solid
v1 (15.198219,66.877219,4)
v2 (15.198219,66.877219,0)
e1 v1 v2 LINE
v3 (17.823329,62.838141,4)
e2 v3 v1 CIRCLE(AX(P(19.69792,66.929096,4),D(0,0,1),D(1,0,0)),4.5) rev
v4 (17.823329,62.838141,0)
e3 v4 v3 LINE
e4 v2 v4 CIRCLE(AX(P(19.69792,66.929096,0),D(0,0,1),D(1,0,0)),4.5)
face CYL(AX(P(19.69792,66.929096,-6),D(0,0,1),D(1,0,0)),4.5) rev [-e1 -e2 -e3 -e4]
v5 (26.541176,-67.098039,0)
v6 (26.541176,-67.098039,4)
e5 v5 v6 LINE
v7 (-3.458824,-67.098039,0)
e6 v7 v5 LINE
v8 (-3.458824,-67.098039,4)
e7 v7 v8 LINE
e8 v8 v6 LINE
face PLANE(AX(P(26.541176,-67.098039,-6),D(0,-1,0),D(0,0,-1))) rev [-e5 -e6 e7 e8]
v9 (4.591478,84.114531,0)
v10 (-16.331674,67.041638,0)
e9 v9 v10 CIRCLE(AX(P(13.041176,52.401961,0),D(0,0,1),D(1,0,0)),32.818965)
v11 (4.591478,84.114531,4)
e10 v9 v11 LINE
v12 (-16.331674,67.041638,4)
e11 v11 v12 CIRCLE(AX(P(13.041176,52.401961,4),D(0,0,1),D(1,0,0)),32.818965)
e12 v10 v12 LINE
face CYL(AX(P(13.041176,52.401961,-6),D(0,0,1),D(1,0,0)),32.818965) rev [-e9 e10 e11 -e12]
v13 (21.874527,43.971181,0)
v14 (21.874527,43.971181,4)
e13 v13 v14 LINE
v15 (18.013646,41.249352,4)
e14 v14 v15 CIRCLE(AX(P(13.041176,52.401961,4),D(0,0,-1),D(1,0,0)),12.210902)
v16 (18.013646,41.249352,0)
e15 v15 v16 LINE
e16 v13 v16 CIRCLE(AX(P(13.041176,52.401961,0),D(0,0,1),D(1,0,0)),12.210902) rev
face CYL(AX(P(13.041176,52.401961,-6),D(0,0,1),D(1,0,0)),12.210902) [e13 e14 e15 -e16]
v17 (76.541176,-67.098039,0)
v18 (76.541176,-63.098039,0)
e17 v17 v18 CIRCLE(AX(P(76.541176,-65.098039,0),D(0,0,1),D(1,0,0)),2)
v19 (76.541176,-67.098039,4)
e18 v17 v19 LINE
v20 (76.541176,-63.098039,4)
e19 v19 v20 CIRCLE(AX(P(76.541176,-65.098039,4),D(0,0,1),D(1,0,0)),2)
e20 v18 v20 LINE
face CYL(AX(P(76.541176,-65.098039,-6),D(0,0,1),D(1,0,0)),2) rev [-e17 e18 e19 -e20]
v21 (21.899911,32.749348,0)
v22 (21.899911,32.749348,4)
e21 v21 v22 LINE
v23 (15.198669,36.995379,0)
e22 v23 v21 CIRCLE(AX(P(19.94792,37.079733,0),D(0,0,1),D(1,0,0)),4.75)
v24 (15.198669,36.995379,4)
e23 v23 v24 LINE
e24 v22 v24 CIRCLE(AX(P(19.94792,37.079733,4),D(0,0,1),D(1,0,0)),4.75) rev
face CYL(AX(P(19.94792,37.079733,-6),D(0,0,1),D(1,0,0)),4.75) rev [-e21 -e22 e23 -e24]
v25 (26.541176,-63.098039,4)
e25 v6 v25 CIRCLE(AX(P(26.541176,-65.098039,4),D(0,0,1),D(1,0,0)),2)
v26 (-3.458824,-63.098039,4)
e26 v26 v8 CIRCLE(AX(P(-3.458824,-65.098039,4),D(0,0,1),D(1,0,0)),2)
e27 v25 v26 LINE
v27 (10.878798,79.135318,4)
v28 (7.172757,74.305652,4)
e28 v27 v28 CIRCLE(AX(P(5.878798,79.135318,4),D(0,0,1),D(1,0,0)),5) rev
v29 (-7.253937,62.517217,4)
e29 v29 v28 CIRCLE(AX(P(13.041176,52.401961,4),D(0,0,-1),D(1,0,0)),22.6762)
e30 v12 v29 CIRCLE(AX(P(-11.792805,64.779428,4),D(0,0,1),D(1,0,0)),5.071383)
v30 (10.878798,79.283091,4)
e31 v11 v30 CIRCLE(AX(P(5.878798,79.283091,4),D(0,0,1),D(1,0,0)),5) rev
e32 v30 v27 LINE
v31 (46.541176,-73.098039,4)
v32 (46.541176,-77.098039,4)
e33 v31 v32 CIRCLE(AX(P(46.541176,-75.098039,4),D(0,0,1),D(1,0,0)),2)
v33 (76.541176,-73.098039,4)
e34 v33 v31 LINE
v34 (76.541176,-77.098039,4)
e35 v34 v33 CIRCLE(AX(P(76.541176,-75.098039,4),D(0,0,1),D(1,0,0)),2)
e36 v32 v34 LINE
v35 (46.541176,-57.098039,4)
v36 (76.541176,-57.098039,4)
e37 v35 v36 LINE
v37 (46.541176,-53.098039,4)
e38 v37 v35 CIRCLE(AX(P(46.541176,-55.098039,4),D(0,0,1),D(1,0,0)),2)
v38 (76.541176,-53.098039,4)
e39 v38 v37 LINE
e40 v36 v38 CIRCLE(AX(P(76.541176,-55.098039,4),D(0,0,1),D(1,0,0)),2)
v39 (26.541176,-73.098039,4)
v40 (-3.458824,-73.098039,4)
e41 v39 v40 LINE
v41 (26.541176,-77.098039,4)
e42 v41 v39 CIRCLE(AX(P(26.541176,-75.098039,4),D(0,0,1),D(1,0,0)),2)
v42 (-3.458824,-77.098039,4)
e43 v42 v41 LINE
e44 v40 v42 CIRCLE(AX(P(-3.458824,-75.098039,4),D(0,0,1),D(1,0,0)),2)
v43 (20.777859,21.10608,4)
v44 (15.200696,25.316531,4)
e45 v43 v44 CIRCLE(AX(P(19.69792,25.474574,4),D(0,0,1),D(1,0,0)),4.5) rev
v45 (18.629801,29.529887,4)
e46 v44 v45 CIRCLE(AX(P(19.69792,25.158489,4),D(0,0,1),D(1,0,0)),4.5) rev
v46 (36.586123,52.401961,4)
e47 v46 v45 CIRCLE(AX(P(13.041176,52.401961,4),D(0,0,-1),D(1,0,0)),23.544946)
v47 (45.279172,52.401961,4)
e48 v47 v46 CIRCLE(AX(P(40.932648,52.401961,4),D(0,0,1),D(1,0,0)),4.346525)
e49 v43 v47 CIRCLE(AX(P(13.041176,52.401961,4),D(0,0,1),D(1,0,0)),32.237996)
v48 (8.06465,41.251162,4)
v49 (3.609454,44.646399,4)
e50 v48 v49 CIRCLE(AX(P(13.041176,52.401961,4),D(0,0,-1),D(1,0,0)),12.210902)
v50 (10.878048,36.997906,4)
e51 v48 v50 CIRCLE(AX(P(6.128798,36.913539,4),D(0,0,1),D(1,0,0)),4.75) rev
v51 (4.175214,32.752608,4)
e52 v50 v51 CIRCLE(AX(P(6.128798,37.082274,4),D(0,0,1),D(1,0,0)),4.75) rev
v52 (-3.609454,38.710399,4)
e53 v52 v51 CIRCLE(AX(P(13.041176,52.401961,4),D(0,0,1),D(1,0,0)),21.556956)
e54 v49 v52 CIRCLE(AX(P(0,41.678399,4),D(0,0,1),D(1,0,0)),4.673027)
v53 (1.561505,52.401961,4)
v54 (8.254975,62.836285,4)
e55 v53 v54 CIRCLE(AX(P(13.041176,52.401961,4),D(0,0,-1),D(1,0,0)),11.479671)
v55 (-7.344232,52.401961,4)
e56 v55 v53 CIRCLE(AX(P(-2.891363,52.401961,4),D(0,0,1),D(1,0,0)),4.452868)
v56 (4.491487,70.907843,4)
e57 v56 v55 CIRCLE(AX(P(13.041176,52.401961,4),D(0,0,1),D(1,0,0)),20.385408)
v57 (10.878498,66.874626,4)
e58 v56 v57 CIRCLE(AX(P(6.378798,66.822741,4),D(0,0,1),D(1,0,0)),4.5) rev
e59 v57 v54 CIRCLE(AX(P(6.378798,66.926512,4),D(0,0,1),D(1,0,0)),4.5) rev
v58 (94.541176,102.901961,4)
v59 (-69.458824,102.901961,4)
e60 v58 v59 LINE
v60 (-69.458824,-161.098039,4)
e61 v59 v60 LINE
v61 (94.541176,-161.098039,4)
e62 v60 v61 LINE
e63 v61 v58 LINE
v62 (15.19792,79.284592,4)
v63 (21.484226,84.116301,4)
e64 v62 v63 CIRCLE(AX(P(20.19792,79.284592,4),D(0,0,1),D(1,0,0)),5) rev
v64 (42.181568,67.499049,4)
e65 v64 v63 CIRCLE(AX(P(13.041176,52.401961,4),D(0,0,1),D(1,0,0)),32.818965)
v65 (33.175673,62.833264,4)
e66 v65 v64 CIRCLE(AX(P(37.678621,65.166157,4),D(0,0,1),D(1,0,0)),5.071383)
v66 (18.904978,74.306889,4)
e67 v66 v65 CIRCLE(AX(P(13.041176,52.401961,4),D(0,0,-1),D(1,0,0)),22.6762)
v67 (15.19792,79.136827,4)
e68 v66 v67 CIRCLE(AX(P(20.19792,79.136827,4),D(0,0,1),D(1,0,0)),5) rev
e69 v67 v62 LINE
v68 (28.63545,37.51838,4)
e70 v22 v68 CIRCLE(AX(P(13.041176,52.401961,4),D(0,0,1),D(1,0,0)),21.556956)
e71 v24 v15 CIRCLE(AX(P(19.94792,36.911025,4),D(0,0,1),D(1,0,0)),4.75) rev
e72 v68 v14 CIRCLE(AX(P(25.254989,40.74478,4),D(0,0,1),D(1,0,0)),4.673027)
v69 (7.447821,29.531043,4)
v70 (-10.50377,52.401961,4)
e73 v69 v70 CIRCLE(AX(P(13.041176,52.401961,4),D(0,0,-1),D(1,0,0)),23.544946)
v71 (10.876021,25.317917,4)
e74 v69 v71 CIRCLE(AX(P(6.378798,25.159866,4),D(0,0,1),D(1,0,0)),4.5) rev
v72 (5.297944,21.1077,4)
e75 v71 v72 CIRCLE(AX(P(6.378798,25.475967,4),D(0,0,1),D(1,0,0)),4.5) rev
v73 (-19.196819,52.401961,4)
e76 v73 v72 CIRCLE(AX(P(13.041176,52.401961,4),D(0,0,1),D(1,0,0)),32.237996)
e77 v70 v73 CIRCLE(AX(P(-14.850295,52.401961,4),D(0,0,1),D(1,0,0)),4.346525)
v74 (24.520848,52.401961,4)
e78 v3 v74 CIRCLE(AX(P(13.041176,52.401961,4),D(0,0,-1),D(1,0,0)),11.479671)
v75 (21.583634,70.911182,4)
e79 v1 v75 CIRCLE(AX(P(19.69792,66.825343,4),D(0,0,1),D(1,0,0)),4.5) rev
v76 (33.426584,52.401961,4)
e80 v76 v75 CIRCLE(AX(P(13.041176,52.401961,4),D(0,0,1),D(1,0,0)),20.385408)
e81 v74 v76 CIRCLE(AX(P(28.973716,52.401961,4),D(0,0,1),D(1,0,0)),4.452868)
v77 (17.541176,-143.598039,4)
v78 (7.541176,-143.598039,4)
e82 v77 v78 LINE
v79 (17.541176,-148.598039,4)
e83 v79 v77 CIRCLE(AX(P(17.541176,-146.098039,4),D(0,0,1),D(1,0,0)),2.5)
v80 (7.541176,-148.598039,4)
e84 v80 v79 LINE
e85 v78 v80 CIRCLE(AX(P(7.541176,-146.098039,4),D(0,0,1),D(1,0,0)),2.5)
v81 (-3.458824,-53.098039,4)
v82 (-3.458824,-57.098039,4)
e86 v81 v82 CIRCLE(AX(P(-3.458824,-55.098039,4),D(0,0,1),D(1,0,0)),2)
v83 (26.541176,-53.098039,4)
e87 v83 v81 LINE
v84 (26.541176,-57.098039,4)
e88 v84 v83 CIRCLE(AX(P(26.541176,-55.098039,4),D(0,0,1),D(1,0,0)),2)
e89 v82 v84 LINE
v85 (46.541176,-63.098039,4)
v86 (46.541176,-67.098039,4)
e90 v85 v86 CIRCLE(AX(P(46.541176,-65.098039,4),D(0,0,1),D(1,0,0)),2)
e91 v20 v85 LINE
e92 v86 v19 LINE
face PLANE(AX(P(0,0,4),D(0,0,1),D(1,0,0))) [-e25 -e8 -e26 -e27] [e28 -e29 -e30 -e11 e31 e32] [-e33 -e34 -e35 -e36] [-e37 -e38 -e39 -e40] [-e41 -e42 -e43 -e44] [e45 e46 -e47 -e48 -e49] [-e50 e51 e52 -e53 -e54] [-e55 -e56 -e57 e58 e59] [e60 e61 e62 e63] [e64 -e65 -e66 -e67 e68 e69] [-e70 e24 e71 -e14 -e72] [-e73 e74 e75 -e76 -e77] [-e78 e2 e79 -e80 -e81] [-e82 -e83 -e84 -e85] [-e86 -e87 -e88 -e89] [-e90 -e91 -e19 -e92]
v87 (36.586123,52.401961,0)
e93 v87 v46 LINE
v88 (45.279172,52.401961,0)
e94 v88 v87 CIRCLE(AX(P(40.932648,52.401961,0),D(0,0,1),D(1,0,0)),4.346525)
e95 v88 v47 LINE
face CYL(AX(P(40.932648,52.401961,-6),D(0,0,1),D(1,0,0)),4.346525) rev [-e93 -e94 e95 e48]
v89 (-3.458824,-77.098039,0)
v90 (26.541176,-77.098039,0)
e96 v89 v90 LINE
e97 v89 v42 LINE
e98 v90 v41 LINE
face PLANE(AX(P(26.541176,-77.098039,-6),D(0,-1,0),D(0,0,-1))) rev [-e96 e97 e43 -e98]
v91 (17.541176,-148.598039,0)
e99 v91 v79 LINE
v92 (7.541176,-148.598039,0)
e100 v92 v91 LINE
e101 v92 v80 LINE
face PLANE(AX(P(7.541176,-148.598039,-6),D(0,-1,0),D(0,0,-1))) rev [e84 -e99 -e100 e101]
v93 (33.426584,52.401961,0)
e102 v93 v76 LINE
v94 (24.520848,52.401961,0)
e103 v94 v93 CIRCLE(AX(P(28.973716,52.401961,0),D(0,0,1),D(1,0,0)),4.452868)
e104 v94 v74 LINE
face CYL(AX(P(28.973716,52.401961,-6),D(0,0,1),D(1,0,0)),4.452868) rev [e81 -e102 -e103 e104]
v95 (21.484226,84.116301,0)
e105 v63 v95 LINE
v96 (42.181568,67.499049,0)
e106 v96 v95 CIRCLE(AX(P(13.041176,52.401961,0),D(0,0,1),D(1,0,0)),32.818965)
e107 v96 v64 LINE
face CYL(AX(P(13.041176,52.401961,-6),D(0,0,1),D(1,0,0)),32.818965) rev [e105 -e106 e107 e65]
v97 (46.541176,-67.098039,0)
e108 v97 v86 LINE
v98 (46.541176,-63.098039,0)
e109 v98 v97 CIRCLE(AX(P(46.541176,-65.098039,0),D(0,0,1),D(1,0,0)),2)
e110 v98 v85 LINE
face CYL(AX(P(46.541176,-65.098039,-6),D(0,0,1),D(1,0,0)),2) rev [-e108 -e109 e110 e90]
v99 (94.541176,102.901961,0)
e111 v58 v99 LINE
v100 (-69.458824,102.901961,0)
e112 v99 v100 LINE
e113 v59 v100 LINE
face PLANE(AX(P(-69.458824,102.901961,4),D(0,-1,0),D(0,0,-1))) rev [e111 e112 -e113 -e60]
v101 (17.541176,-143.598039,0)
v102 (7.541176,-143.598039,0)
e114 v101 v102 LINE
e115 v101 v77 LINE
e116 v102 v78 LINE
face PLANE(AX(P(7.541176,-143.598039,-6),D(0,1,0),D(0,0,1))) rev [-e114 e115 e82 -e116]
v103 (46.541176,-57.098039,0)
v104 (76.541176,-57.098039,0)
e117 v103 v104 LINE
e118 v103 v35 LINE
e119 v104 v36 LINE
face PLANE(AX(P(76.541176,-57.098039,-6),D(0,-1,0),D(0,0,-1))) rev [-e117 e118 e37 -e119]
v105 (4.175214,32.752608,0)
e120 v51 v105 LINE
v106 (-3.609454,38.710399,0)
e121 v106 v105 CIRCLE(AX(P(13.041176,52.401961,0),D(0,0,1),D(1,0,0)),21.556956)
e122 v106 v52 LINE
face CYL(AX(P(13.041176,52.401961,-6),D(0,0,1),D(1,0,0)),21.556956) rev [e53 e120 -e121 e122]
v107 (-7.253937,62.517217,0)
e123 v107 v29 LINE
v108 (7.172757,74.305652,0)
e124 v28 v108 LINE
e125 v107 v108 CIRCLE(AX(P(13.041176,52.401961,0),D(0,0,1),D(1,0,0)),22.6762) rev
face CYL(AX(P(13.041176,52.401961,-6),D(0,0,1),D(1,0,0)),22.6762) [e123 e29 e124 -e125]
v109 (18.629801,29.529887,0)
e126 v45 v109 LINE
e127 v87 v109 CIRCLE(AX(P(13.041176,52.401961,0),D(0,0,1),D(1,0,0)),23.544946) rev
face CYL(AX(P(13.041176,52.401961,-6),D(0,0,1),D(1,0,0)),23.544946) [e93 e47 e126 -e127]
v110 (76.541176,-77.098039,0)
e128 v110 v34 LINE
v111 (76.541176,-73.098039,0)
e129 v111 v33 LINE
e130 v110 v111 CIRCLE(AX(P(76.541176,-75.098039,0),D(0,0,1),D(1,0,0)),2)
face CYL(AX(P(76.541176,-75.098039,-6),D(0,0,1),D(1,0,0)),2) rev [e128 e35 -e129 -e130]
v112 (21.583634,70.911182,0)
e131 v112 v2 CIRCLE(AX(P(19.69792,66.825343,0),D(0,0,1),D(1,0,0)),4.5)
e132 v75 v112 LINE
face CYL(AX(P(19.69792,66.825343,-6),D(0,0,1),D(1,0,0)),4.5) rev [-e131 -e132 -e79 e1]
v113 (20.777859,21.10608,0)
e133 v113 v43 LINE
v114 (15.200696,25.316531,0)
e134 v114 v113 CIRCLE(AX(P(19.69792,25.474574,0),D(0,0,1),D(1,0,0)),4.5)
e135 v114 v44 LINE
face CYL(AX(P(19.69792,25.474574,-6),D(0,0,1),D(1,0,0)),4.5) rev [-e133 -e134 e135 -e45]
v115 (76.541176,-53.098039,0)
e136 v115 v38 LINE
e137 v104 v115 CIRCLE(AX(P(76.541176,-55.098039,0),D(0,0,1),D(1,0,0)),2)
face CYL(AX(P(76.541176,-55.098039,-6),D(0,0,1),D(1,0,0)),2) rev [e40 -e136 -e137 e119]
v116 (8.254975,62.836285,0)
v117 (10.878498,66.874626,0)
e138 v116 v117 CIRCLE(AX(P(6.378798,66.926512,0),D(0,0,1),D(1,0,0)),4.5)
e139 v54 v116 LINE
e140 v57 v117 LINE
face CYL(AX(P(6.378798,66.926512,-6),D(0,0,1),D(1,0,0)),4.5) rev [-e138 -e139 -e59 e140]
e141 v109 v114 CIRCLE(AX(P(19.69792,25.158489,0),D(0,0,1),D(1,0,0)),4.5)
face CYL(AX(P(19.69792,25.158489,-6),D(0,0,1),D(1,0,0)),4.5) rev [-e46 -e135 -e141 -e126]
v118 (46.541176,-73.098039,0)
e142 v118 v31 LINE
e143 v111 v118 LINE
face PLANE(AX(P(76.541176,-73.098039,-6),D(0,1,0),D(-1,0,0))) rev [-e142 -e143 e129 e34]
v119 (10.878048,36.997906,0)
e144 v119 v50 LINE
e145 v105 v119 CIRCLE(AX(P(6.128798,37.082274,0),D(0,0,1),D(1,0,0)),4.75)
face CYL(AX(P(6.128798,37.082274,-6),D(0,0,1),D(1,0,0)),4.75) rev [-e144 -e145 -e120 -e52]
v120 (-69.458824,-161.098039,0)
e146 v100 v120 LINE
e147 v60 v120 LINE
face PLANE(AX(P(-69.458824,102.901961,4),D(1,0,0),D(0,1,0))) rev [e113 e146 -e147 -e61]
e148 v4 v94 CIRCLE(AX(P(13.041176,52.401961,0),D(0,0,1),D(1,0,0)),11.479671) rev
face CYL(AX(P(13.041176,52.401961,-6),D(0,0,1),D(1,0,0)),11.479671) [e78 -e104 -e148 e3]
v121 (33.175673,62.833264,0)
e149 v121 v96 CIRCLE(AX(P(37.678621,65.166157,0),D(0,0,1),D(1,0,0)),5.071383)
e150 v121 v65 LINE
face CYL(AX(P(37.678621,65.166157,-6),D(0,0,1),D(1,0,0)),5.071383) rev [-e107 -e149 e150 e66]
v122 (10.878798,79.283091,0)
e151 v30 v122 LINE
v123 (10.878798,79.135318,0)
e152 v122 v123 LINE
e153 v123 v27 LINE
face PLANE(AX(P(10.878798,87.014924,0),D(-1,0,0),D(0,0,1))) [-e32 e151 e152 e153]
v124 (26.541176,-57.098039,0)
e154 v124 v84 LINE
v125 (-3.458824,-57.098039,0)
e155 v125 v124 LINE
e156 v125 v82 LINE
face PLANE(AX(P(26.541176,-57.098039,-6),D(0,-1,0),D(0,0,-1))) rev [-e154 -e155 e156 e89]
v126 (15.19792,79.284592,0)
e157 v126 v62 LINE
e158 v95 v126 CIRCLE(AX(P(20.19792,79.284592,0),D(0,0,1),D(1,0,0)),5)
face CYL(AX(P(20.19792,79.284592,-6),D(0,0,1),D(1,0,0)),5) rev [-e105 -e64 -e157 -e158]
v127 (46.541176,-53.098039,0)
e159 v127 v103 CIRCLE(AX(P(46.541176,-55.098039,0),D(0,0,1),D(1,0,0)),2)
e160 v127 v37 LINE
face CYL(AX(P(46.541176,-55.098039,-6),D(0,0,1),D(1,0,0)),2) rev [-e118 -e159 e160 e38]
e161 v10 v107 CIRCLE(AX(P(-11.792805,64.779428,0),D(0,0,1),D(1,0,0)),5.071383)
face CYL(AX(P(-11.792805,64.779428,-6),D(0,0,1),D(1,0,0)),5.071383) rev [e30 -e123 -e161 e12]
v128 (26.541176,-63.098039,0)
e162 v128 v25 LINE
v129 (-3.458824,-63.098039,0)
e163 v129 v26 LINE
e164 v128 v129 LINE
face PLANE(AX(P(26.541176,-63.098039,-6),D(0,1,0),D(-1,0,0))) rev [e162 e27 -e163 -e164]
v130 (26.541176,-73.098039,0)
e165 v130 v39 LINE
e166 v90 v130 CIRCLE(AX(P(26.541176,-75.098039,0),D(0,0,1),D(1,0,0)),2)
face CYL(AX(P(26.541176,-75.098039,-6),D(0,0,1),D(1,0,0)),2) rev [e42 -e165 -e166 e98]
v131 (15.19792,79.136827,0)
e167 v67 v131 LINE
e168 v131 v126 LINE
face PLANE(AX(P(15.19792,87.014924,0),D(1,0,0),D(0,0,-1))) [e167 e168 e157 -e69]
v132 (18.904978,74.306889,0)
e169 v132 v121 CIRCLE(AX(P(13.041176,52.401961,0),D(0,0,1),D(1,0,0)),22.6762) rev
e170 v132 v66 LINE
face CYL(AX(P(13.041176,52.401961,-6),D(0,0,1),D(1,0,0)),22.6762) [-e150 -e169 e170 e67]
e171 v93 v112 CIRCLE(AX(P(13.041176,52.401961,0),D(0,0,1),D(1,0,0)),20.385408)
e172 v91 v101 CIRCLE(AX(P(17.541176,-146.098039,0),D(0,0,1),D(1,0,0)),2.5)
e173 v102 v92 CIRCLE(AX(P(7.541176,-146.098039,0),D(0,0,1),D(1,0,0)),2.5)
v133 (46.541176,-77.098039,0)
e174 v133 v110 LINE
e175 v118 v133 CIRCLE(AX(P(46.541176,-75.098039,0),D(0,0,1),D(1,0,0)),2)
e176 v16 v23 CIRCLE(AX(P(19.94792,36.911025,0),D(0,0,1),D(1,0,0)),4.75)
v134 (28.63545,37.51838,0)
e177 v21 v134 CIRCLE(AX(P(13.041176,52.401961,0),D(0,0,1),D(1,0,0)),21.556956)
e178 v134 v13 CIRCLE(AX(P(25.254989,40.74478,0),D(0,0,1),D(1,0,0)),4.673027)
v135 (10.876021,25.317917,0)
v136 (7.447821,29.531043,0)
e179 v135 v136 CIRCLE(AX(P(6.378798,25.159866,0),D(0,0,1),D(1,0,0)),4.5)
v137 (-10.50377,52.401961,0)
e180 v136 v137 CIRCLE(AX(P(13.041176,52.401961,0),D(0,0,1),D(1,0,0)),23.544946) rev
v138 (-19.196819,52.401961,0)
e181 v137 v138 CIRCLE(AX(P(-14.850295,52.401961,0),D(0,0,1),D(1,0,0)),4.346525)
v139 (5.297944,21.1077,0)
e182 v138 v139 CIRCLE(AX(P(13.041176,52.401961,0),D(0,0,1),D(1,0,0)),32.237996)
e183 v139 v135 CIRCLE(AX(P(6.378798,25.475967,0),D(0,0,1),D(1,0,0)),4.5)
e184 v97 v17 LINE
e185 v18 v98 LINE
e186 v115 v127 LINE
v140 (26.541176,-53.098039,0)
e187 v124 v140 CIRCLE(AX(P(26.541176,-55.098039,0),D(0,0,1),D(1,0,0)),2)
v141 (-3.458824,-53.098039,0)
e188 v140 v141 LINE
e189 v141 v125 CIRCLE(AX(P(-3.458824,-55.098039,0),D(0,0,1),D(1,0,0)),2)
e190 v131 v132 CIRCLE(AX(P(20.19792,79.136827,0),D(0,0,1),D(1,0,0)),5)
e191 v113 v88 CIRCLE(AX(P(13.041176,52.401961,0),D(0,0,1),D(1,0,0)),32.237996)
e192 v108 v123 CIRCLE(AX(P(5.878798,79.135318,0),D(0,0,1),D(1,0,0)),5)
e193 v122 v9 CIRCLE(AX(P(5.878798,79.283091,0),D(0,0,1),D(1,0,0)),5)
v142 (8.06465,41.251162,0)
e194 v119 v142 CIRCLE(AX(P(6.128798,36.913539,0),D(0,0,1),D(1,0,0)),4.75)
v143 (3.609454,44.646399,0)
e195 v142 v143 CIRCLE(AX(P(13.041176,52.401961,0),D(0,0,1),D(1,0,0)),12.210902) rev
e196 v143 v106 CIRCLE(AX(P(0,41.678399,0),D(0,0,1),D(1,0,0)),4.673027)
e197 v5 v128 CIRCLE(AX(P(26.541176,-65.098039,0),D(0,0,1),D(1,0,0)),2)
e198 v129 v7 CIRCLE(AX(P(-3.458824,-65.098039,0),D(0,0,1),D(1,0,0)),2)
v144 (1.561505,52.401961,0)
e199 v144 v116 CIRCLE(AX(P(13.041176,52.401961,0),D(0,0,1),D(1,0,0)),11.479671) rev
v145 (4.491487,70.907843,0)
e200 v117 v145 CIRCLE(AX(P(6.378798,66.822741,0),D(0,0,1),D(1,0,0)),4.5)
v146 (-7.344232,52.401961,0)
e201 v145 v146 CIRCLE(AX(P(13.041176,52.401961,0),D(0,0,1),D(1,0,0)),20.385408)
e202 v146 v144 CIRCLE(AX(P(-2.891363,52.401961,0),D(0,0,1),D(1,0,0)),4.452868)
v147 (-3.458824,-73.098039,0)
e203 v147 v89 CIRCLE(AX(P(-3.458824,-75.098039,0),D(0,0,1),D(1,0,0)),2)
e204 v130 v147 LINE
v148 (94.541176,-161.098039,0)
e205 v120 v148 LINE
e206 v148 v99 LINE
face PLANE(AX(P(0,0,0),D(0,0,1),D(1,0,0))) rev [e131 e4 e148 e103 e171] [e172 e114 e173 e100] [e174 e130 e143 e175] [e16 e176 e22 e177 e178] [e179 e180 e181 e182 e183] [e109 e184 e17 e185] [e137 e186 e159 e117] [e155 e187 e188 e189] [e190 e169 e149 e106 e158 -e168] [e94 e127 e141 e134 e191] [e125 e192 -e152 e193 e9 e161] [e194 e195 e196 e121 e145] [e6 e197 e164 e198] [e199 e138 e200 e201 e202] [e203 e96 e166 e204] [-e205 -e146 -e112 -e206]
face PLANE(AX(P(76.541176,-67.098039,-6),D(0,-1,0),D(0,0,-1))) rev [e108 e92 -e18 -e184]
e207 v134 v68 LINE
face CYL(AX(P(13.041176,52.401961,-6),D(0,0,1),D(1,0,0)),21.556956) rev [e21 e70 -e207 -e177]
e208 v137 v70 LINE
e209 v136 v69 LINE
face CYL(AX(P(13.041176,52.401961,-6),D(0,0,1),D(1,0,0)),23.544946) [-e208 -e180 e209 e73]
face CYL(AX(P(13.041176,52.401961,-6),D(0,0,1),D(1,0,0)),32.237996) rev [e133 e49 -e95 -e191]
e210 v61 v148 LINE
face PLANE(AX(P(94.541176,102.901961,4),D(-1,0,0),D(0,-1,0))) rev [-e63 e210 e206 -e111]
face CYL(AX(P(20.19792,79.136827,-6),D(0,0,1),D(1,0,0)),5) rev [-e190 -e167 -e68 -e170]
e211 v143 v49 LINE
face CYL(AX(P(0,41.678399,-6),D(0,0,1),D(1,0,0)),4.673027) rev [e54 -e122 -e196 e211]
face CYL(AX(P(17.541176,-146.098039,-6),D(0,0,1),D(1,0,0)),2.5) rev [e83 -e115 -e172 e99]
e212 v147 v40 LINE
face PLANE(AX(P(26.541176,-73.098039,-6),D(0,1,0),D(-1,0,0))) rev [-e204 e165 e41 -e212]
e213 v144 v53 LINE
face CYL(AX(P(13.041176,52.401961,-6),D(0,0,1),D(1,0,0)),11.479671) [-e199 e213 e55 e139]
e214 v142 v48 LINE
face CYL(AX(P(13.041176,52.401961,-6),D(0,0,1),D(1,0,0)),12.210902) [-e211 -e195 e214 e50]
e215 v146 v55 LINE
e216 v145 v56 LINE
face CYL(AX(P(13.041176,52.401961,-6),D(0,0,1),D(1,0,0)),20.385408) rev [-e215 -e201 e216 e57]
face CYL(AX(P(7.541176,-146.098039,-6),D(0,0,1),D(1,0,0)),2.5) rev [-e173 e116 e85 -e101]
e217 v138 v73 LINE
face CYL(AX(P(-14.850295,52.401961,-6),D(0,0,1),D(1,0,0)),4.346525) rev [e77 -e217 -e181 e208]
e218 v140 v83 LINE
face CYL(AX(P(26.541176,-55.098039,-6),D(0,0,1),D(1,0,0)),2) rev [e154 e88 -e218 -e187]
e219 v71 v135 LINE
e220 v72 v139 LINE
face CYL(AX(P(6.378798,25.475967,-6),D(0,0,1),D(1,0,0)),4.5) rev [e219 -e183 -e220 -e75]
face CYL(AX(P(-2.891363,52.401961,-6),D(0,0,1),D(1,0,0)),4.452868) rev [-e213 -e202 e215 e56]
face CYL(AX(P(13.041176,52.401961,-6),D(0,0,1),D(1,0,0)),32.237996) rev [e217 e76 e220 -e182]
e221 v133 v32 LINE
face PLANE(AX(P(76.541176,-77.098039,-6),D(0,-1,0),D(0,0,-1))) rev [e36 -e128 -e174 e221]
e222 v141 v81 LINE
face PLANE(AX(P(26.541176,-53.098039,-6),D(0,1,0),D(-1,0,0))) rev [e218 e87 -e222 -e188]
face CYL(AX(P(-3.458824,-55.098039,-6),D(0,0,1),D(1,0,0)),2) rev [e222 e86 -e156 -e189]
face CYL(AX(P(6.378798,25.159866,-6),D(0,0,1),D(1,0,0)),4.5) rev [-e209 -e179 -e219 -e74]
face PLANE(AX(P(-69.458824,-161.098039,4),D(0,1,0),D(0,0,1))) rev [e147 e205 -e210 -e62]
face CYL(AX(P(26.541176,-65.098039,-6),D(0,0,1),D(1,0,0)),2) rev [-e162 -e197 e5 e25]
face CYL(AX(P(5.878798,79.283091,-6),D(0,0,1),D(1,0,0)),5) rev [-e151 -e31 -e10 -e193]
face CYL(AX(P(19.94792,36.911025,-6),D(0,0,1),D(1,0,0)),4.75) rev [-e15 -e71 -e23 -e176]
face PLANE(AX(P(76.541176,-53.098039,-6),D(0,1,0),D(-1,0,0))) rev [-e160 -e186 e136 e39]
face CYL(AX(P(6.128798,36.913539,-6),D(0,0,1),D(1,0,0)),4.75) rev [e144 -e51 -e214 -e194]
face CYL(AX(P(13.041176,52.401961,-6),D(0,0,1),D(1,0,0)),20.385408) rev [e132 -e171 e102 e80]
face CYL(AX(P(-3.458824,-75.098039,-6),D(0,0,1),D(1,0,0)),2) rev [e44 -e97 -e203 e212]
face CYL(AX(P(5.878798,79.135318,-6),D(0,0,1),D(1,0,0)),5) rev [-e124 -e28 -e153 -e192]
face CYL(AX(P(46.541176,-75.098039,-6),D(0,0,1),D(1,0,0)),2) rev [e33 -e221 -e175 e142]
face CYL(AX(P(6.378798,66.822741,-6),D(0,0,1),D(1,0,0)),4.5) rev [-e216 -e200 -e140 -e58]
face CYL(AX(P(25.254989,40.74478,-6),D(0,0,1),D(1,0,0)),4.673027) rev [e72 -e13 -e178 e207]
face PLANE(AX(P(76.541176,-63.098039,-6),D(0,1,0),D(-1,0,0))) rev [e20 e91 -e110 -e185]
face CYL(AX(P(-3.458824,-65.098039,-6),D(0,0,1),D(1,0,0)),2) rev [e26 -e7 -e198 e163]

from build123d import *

# Parameters (mm, degrees)
SKETCH1_W            = 164
SKETCH1_H            = 264
BOSS_EXTRUDE1_DEPTH  = 4
CUT_EXTRUDE3_DEPTH   = 10
CUT_EXTRUDE4_DEPTH   = 10
LPATTERN1_COUNT      = 3
LPATTERN1_PITCH      = 10
LPATTERN1_COUNT_DIR2 = 2
LPATTERN1_PITCH_DIR2 = 50
CUT_EXTRUDE5_DEPTH   = 10
SKETCH5_W            = 4.319122357
SKETCH5_H            = 26.937684175
SKETCH5_H_2          = 25.730682063
BOSS_EXTRUDE2_DEPTH  = 4
FILLET3_R            = 5
FILLET4_R            = 5
FILLET5_R            = 4.5
FILLET6_R            = 4.5
FILLET7_R            = 4.75
FILLET8_R            = 4.75
FILLET9_R            = 4.5
FILLET10_R           = 4.5


with BuildPart() as part:
    # Sketch1 → Boss-Extrude1 (new body)
    with BuildSketch(Plane.XY):
        with Locations((12.541176471, -29.098039216)):
            Rectangle(SKETCH1_W, SKETCH1_H)
    extrude(amount=BOSS_EXTRUDE1_DEPTH)

    # Sketch2 → Cut-Extrude3 (cut)
    with BuildSketch(Plane.XY.offset(4)):
        with BuildLine():
            ThreePointArc((-19.196819428, 52.401960784), (13.041176471, 20.163964886), (45.279172369, 52.401960784))
            ThreePointArc((45.279172369, 52.401960784), (40.932647519, 56.748485634), (36.58612267, 52.401960784))
            ThreePointArc((36.58612267, 52.401960784), (13.041176471, 28.857014585), (-10.503769729, 52.401960784))
            ThreePointArc((-10.503769729, 52.401960784), (-14.850294578, 56.748485634), (-19.196819428, 52.401960784))
        make_face()
        with BuildLine():
            ThreePointArc((33.426584493, 52.401960784), (13.041176471, 72.787368807), (-7.344231552, 52.401960784))
            ThreePointArc((-7.344231552, 52.401960784), (-2.891363068, 47.949092301), (1.561505415, 52.401960784))
            ThreePointArc((1.561505415, 52.401960784), (13.041176471, 63.88163184), (24.520847526, 52.401960784))
            ThreePointArc((24.520847526, 52.401960784), (28.97371601, 47.949092301), (33.426584493, 52.401960784))
        make_face()
        with BuildLine():
            ThreePointArc((42.181568033, 67.499048907), (12.784631297, 85.219923468), (-16.331673874, 67.04163813))
            ThreePointArc((-16.331673874, 67.04163813), (-14.055015917, 60.240559274), (-7.253937061, 62.517217231))
            ThreePointArc((-7.253937061, 62.517217231), (12.863917084, 75.077467953), (33.17567306, 62.833264313))
            ThreePointArc((33.17567306, 62.833264313), (40.011512844, 60.663209124), (42.181568033, 67.499048907))
        make_face()
        with BuildLine():
            ThreePointArc((-3.609454357, 38.710399181), (12.244809645, 30.859719351), (28.635450382, 37.518379654))
            ThreePointArc((28.635450382, 37.518379654), (28.481389363, 44.125242049), (21.874526968, 43.97118103))
            ThreePointArc((21.874526968, 43.97118103), (12.590075808, 40.199393986), (3.609454357, 44.646398506))
            ThreePointArc((3.609454357, 44.646398506), (-2.967999663, 45.2878532), (-3.609454357, 38.710399181))
        make_face()
    extrude(amount=-CUT_EXTRUDE3_DEPTH, mode=Mode.SUBTRACT)

    # Sketch3 → Cut-Extrude4 (cut)
    with BuildSketch(Plane.XY.offset(4)):
        with BuildLine():
            Line((76.541176471, -57.098039216), (46.541176471, -57.098039216))
            ThreePointArc((46.541176471, -57.098039216), (44.541176471, -55.098039216), (46.541176471, -53.098039216))
            Line((46.541176471, -53.098039216), (76.541176471, -53.098039216))
            ThreePointArc((76.541176471, -53.098039216), (78.541176471, -55.098039216), (76.541176471, -57.098039216))
        make_face()
    cut_extrude4 = extrude(amount=-CUT_EXTRUDE4_DEPTH, mode=Mode.SUBTRACT)

    # LPattern1: Cut-Extrude4 3 × 2
    with Locations(*[(-j * LPATTERN1_PITCH_DIR2, -i * LPATTERN1_PITCH, 0) for i in range(LPATTERN1_COUNT) for j in range(LPATTERN1_COUNT_DIR2) if (i, j) != (0, 0)]):
        add(cut_extrude4, mode=Mode.SUBTRACT)

    # Sketch4 → Cut-Extrude5 (cut)
    with BuildSketch(Plane.XY.offset(4)):
        with BuildLine():
            Line((7.541176471, -143.598039216), (17.541176471, -143.598039216))
            ThreePointArc((17.541176471, -143.598039216), (20.041176471, -146.098039216), (17.541176471, -148.598039216))
            Line((17.541176471, -148.598039216), (7.541176471, -148.598039216))
            ThreePointArc((7.541176471, -148.598039216), (5.041176471, -146.098039216), (7.541176471, -143.598039216))
        make_face()
    extrude(amount=-CUT_EXTRUDE5_DEPTH, mode=Mode.SUBTRACT)

    # Sketch5 → Boss-Extrude2 (add)
    with BuildSketch(Plane.XY.offset(4)):
        with Locations((13.038358708, 73.546081582)):
            Rectangle(SKETCH5_W, SKETCH5_H)
        with Locations((13.038358708, 29.708086806)):
            Rectangle(SKETCH5_W, SKETCH5_H_2)
    extrude(amount=-BOSS_EXTRUDE2_DEPTH)

    # Fillet3
    fillet3_edges = [part.edges().sort_by_distance(p)[0] for p in [
        (15.197919886, 74.975363365, 2),
        (15.197919886, 85.149982831, 2),
    ]]
    fillet(fillet3_edges, radius=FILLET3_R)

    # Fillet4
    fillet4_edges = [part.edges().sort_by_distance(p)[0] for p in [
        (10.878797529, 74.974824217, 2),
        (10.878797529, 85.149611196, 2),
    ]]
    fillet(fillet4_edges, radius=FILLET4_R)

    # Fillet5
    # the kernel refuses this fillet: 4.5 mm, written as the material it adds along each edge
    with BuildSketch(Plane(origin=(10.878797529, 63.676133253, 0), x_dir=(-0.952400444463688, -0.3048497882324502, 0), z_dir=(0, 0, 1))) as fillet5_piece_1:
        with BuildLine():
            CenterArc((3.294924666, -4.467486403), FILLET5_R, 96.891689821, 65.359183141)
            Line((-0.990877334, -3.095662356), (0, 0))
            ThreePointArc((0, 0), (1.377478425, -0.082943423), (2.75495685, 0))
        make_face()
    extrude(amount=4)
    with BuildSketch(Plane(origin=(10.878797529, 72.672357366, 0), x_dir=(0, -1, 0), z_dir=(0, 0, 1))) as fillet5_piece_2:
        with BuildLine():
            CenterArc((5.849616613, -4.5), FILLET5_R, 90, 114.796867003)
            ThreePointArc((1.764514753, -6.387310996), (0.620984955, -3.265832826), (0, 0))
            Line((0, 0), (5.849616613, 0))
        make_face()
    extrude(amount=4)

    # Fillet6
    # the kernel refuses this fillet: 4.5 mm, written as the material it adds along each edge
    with BuildSketch(Plane(origin=(15.197919886, 72.672957753, 0), x_dir=(0.963984906204346, -0.2659569525509686, 0), z_dir=(0, 0, 1))) as fillet6_piece_1:
        with BuildLine():
            CenterArc((5.893145872, -4.440206052), FILLET6_R, 80.649344531, 114.774478291)
            Line((1.555213794, -5.637012339), (0, 0))
            ThreePointArc((0, 0), (3.312144479, 0.270872005), (6.624288959, 0))
        make_face()
    extrude(amount=4)
    with BuildSketch(Plane(origin=(15.197919886, 63.677212683, 0), x_dir=(0.9525356739175572, -0.30442698617965064, 0), z_dir=(0, 0, 1))) as fillet6_piece_2:
        with BuildLine():
            CenterArc((3.296449531, 4.467456192), FILLET6_R, 197.723693353, 65.381411924)
            Line((-0.989961002, 3.097534754), (0, 0))
            ThreePointArc((0, 0), (1.378115911, 0.083020491), (2.756231822, 0))
        make_face()
    extrude(amount=4)

    # Fillet7
    # the kernel refuses this fillet: 4.75 mm, written as the material it adds along each edge
    with BuildSketch(Plane(origin=(15.197919886, 30.953165389, 0), x_dir=(0, 1, 0), z_dir=(0, 0, 1))) as fillet7_piece_1:
        with BuildLine():
            CenterArc((6.126567217, -4.75), FILLET7_R, 90, 114.26424477)
            ThreePointArc((1.796182676, -6.701991222), (0.626677135, -3.423736603), (0, 0))
            Line((0, 0), (6.126567217, 0))
        make_face()
    extrude(amount=4)
    with BuildSketch(Plane(origin=(15.197919886, 40.383034621, 0), x_dir=(0.9557846908185708, 0.2940673813887714, 0), z_dir=(0, 0, 1))) as fillet7_piece_2:
        with BuildLine():
            CenterArc((3.51897249, -4.715313748), FILLET7_R, 96.928419065, 65.969959025)
            Line((-1.021004791, -3.318493687), (0, 0))
            ThreePointArc((0, 0), (1.472991805, -0.08916851), (2.94598361, 0))
        make_face()
    extrude(amount=4)

    # Fillet8
    # the kernel refuses this fillet: 4.75 mm, written as the material it adds along each edge
    with BuildSketch(Plane(origin=(10.878797529, 40.384047255, 0), x_dir=(0, -1, 0), z_dir=(0, 0, 1))) as fillet8_piece_1:
        with BuildLine():
            CenterArc((3.470508434, -4.75), FILLET8_R, 90, 65.949113414)
            ThreePointArc((-0.867114896, -2.814147772), (-0.348416422, -1.433308135), (0, 0))
            Line((0, 0), (3.470508434, 0))
        make_face()
    extrude(amount=4)
    with BuildSketch(Plane(origin=(10.878797529, 30.953732806, 0), x_dir=(-0.9658301221176608, 0.2591759541511984, 0), z_dir=(0, 0, 1))) as fillet8_piece_2:
        with BuildLine():
            CenterArc((6.176063632, -4.688044059), FILLET8_R, 80.735851864, 114.285319943)
            Line((1.588370552, -5.919129841), (0, 0))
            ThreePointArc((0, 0), (3.470374234, 0.281175054), (6.940748468, 0))
        make_face()
    extrude(amount=4)

    # Fillet9
    # the kernel refuses this fillet: 4.5 mm, written as the material it adds along each edge
    with BuildSketch(Plane(origin=(10.878797529, 20.23656794, 0), x_dir=(0, 1, 0), z_dir=(0, 0, 1))) as fillet9_piece_1:
        with BuildLine():
            CenterArc((5.239399394, 4.5), FILLET9_R, 166.10226732, 103.89773268)
            ThreePointArc((0.871132452, 5.58085333), (0.313102845, 2.809542348), (0, 0))
            Line((0, 0), (5.239399394, 0))
        make_face()
    extrude(amount=4)
    with BuildSketch(Plane(origin=(10.878797529, 28.956521807, 0), x_dir=(-0.9862681446857605, 0.16515189002281502, 0), z_dir=(0, 0, 1))) as fillet9_piece_2:
        with BuildLine():
            CenterArc((3.811181811, 4.487703929), FILLET9_R, 189.50605818, 76.257380527)
            Line((-0.62702484, 3.744520424), (0, 0))
            ThreePointArc((0, 0), (1.739373093, 0.064335629), (3.478746186, 0))
        make_face()
    extrude(amount=4)

    # Fillet10
    # the kernel refuses this fillet: 4.5 mm, written as the material it adds along each edge
    with BuildSketch(Plane(origin=(15.197919886, 20.236189577, 0), x_dir=(0.9880653050237032, 0.15403555761062557, 0), z_dir=(0, 0, 1))) as fillet10_piece_1:
        with BuildLine():
            CenterArc((5.253191268, 4.482705444), FILLET10_R, 171.139133949, 103.885741164)
            Line((0.806897395, 5.175865453), (0, 0))
            ThreePointArc((0, 0), (2.823669163, -0.123898184), (5.647338326, 0))
        make_face()
    extrude(amount=4)
    with BuildSketch(Plane(origin=(15.197919886, 28.956002724, 0), x_dir=(0.9863050503076972, 0.16493134249599425, 0), z_dir=(0, 0, 1))) as fillet10_piece_2:
        with BuildLine():
            CenterArc((3.812043631, -4.48769836), FILLET10_R, 94.237521054, 76.269232907)
            Line((-0.626329096, -3.745507319), (0, 0))
            ThreePointArc((0, 0), (1.739766416, -0.064364768), (3.479532832, 0))
        make_face()
    extrude(amount=4)


solid = part.part
